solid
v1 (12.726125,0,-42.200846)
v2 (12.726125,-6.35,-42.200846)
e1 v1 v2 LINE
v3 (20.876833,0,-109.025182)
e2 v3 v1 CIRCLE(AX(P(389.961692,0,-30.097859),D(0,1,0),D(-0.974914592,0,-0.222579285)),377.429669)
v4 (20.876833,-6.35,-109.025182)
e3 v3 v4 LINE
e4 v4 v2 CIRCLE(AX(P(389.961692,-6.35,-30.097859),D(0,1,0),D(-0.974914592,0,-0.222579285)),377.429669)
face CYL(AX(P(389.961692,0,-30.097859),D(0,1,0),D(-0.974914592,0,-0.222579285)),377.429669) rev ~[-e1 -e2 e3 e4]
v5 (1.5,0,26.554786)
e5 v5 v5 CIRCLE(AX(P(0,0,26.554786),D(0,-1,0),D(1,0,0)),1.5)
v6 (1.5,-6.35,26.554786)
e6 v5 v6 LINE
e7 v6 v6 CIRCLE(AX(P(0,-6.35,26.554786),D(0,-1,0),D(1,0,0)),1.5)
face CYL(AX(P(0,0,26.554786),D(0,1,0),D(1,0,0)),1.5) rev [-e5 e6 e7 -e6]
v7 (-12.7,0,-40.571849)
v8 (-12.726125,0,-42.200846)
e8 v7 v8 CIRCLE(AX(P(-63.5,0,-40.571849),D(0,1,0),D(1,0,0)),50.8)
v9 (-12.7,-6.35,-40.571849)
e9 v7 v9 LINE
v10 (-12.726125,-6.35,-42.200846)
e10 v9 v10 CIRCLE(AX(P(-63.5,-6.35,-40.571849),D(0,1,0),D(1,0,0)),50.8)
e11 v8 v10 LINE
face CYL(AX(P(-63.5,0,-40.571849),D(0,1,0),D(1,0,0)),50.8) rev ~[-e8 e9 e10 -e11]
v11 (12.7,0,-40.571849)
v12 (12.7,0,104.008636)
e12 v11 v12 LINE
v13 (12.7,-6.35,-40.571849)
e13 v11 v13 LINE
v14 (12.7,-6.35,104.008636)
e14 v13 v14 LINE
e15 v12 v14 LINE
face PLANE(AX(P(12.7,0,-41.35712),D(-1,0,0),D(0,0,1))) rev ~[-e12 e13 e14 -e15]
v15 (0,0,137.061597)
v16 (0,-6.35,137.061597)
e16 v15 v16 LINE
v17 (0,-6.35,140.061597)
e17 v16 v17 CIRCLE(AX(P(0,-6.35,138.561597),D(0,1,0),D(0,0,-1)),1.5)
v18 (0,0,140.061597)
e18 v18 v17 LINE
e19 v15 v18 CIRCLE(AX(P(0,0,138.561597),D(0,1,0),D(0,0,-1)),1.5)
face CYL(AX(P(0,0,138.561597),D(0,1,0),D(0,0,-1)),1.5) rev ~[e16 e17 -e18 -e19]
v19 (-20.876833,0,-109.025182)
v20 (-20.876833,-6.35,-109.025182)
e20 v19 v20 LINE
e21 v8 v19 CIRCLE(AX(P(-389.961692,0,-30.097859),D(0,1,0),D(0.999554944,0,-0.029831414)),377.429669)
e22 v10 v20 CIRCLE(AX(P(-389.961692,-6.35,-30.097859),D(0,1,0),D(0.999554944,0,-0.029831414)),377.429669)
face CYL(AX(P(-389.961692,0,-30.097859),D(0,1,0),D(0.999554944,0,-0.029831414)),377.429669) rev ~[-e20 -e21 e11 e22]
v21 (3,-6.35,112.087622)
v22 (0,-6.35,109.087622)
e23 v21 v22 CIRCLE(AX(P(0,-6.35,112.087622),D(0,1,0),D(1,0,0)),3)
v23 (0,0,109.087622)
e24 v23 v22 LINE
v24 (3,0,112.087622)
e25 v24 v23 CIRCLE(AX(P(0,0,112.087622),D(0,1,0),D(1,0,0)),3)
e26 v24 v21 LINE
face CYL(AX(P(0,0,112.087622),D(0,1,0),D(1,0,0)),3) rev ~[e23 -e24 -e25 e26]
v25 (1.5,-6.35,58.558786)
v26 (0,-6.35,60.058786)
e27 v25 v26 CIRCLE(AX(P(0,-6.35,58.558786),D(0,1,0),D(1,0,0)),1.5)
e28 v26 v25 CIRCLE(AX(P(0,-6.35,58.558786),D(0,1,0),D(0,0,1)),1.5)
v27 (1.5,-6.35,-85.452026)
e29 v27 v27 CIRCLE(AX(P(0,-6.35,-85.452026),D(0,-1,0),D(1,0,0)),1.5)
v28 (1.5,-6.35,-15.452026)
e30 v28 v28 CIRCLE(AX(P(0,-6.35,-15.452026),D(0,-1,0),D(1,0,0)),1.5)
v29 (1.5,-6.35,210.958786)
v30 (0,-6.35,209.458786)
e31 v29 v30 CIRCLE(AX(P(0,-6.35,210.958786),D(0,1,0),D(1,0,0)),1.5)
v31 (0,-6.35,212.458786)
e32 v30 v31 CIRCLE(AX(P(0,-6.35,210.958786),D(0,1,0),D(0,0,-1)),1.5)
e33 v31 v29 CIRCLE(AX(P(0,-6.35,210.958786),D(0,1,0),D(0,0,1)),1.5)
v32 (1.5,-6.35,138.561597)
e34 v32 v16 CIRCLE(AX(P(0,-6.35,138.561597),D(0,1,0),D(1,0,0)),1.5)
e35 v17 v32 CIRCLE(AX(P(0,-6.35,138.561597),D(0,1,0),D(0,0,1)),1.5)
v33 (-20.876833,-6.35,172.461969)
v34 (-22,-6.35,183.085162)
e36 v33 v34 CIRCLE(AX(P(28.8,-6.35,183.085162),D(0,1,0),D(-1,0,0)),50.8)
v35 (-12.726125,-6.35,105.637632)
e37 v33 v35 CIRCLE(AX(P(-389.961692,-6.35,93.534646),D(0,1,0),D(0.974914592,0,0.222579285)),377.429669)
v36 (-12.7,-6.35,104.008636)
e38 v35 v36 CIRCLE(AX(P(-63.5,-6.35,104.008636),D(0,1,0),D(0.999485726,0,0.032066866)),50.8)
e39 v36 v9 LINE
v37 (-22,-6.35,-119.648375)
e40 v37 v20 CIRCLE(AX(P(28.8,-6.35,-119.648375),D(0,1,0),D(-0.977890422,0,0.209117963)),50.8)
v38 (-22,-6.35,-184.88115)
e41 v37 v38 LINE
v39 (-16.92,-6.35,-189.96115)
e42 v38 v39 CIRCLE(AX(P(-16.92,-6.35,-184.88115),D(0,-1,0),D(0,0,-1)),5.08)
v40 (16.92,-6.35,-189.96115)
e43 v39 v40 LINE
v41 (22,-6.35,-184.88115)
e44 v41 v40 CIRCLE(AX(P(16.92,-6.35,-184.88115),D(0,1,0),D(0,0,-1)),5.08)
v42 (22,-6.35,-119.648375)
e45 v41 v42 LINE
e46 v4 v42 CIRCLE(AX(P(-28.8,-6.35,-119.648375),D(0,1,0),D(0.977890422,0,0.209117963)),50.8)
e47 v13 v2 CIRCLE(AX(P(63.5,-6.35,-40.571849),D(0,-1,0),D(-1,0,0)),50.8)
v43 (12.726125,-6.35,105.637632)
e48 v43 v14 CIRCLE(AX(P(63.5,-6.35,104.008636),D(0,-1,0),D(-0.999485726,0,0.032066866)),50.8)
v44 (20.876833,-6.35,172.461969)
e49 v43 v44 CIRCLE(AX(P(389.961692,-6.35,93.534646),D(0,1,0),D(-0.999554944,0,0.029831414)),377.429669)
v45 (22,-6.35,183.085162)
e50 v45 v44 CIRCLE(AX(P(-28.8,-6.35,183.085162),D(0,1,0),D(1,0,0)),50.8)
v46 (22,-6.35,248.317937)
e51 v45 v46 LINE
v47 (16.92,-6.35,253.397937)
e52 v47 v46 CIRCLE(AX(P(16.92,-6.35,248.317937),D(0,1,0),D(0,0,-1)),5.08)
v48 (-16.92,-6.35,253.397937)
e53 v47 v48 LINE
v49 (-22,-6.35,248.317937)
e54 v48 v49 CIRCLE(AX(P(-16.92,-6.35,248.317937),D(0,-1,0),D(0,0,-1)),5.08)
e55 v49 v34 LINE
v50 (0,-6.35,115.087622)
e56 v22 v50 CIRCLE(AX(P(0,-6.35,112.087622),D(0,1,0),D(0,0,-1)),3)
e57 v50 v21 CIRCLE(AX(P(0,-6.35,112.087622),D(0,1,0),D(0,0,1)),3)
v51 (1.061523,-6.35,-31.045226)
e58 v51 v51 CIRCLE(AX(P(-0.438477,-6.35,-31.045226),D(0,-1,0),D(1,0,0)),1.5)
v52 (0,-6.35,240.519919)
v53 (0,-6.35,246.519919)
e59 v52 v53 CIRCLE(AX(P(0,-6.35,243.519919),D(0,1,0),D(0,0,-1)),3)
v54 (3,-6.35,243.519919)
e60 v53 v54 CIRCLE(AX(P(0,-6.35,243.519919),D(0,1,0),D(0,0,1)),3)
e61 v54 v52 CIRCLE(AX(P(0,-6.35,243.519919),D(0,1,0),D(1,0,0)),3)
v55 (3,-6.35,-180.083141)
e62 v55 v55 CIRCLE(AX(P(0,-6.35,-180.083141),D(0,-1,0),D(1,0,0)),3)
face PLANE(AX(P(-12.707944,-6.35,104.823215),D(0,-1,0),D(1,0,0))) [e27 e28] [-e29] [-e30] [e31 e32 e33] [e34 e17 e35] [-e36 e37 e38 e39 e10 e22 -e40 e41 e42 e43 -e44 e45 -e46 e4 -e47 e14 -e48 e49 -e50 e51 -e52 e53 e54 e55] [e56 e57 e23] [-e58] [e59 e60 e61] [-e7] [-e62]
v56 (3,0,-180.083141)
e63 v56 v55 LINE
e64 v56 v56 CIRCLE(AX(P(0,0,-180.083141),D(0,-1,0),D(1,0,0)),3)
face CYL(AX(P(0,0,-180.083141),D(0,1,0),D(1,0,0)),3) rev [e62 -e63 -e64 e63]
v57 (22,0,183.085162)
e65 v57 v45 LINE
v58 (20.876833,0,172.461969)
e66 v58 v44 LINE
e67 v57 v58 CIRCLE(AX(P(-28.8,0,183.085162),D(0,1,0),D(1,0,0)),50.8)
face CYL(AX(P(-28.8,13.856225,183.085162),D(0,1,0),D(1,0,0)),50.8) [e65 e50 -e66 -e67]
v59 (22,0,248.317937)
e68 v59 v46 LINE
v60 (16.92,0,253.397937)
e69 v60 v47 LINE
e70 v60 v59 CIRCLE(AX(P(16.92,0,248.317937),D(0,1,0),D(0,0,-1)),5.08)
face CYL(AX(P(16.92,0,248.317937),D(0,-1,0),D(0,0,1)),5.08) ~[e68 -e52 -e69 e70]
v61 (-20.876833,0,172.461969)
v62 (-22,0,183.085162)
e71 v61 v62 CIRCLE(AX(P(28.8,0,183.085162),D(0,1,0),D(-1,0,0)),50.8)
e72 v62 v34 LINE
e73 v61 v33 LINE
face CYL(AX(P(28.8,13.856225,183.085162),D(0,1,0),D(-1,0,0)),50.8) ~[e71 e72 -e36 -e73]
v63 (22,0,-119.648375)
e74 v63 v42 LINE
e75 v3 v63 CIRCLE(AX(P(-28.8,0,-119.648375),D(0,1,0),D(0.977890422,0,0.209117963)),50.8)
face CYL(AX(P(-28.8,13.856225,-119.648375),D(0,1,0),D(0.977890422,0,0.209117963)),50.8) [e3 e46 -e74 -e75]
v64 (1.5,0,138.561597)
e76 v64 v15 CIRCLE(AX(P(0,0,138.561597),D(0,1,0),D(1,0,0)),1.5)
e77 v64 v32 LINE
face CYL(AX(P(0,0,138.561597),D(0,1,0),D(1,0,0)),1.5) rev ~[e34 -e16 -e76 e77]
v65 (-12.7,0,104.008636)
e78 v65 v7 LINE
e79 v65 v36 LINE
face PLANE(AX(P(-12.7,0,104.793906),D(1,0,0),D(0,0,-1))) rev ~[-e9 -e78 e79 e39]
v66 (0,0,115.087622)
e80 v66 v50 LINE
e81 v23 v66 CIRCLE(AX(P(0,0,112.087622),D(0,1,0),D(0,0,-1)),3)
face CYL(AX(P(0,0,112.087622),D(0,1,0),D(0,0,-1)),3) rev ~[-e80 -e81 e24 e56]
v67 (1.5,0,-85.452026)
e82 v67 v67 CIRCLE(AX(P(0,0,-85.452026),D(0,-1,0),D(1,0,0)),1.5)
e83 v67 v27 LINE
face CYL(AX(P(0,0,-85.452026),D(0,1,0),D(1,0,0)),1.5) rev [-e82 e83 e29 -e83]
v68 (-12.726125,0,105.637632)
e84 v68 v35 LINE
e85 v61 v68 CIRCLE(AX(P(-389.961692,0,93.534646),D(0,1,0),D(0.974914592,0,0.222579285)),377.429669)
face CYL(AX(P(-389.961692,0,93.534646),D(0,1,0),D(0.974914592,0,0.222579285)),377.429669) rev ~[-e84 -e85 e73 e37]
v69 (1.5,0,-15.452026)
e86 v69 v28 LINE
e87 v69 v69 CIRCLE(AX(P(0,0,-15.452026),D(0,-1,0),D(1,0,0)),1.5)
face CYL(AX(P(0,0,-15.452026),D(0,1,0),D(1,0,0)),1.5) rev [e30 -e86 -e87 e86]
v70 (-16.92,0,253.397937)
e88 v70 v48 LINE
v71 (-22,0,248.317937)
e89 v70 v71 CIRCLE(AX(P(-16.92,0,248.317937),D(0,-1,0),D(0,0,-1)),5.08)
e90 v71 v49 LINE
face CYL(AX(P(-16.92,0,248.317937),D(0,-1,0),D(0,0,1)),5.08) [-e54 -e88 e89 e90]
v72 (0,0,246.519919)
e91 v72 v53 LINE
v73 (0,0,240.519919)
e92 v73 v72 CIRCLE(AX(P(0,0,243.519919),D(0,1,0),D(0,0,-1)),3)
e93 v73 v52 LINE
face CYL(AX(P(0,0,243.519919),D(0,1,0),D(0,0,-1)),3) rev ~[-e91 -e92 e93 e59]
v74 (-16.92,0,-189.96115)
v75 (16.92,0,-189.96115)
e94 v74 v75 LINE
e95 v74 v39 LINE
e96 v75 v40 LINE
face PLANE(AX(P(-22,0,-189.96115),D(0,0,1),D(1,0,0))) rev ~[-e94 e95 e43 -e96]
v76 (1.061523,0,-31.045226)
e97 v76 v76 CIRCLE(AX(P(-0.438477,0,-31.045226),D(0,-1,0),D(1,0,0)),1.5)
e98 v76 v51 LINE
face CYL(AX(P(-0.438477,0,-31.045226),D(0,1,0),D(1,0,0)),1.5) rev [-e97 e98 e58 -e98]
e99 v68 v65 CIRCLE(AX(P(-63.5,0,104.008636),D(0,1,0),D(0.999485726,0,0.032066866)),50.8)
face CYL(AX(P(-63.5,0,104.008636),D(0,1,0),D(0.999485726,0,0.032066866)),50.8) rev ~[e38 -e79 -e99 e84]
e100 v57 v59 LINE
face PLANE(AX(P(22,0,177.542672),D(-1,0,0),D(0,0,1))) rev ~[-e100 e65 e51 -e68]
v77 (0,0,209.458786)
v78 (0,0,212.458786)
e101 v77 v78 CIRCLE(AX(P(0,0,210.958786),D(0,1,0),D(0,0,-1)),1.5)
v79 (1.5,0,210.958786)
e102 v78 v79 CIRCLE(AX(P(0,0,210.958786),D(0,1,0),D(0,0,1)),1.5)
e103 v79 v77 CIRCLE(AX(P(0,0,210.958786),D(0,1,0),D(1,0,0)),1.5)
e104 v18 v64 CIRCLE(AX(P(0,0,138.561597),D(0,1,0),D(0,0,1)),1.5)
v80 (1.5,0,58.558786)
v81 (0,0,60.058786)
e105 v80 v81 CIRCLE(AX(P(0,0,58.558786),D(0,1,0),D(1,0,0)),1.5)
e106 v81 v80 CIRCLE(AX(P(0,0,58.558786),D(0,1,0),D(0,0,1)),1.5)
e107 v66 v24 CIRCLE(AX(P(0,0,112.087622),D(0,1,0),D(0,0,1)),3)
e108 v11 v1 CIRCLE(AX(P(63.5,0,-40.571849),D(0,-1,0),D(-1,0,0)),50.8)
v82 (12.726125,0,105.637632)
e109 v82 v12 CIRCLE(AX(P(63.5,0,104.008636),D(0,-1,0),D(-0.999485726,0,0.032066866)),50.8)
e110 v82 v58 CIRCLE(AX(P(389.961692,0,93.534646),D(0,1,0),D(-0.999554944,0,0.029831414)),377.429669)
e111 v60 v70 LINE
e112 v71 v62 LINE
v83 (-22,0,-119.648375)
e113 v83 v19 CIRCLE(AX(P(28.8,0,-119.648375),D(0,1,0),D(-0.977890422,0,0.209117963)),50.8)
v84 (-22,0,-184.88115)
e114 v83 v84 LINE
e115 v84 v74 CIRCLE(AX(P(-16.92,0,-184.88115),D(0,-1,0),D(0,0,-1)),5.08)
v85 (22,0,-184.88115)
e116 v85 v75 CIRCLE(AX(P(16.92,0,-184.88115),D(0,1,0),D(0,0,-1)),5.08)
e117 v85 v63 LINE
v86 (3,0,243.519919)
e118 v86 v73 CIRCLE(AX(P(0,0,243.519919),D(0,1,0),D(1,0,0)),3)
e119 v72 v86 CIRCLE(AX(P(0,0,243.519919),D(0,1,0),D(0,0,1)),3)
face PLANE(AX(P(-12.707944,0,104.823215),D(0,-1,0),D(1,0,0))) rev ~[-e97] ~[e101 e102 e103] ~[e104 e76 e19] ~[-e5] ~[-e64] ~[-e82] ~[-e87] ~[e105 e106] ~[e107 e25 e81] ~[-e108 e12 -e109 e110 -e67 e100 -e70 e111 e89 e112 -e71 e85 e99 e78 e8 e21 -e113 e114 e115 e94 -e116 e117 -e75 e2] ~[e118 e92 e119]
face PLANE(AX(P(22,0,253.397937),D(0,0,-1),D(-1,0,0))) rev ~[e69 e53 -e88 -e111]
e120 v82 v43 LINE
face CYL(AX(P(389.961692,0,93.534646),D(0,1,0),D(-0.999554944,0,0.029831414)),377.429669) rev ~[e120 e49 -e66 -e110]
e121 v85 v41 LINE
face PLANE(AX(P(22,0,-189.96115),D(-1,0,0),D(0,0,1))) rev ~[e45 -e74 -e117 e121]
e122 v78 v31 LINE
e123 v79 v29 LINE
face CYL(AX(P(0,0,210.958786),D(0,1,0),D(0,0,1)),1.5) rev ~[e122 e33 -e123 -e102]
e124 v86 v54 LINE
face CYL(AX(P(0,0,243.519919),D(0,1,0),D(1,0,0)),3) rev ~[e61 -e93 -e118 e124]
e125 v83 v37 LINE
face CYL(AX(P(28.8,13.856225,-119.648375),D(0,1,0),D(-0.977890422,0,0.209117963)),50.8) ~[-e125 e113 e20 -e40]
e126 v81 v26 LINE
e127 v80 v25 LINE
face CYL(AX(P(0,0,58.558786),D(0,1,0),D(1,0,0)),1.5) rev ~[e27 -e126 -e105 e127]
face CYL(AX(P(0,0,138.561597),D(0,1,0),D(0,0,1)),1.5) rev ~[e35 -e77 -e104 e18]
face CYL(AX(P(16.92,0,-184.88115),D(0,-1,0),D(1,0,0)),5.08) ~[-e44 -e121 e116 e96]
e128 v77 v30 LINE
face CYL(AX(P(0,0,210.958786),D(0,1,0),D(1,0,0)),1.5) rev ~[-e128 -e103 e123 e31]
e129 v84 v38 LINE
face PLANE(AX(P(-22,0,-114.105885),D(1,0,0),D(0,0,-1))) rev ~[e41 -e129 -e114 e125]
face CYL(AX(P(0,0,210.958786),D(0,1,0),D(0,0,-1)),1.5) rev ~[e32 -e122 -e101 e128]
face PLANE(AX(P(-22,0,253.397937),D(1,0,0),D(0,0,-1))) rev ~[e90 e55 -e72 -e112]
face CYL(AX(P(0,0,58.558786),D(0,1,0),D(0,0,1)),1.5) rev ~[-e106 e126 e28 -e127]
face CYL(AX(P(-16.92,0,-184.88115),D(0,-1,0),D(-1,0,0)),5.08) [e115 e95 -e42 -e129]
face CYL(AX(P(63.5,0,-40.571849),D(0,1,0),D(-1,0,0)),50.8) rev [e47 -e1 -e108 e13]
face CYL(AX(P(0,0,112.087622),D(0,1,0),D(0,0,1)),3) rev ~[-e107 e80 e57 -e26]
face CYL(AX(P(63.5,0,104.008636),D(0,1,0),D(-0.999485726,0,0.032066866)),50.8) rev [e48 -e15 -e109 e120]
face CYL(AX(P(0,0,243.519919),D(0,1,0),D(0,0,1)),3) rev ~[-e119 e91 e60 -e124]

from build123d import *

# Parameters (mm, degrees)
F0_R        = 1.5
F0_R_2      = 3
F1_DEPTH    = 6.35
F2_R        = 5.08
F3_T1_DEPTH = 6.35
F3_T3_DEPTH = 34.0624500619


# Not quite as in the source:
# - a fillet or chamfer that OpenCascade refuses, or shapes differently, is made with other operations: its cross-section is extruded or revolved along the edge and cut away or added
# - a feature names something its author has since deleted; it is built from what else it names


with BuildPart() as f1:
    # F0 (on Front) → F1 (new body)
    with BuildSketch(Plane.XZ):
        Polygon((-12.7, 104.7939062119), (-12.7, -41.3571195934), (-12.7, -95.0903743505), (12.7, -95.0903743505), (12.7, -41.3571195934), (12.7, 104.7939062119), (12.7, 162.231490016), (0, 162.231490016), (-12.7, 162.231490016), align=None)
        with Locations((-0.4384766798, -31.0452261312)):
            Circle(F0_R, mode=Mode.SUBTRACT)
        with Locations((0, -85.4520261312)):
            Circle(F0_R, mode=Mode.SUBTRACT)
        with Locations((0, -15.4520261312)):
            Circle(F0_R, mode=Mode.SUBTRACT)
        with Locations((0, 26.5547856688)):
            Circle(F0_R, mode=Mode.SUBTRACT)
        with BuildLine():
            ThreePointArc((1.5, 58.5587856688), (-1.0606601718, 57.4981254971), (0, 60.0587856688))
            ThreePointArc((0, 60.0587856688), (1.0606601718, 59.6194458406), (1.5, 58.5587856688))
        make_face(mode=Mode.SUBTRACT)
        with BuildLine():
            ThreePointArc((0, 109.0876222849), (-3, 112.0876222849), (0, 115.0876222849))
            ThreePointArc((0, 115.0876222849), (2.1213203436, 114.2089426284), (3, 112.0876222849))
            ThreePointArc((3, 112.0876222849), (2.1213203436, 109.9663019413), (0, 109.0876222849))
        make_face(mode=Mode.SUBTRACT)
        with BuildLine():
            ThreePointArc((0, 137.0615974688), (-1.5, 138.5615974688), (0, 140.0615974688))
            ThreePointArc((0, 140.0615974688), (1.0606601718, 139.6222576406), (1.5, 138.5615974688))
            ThreePointArc((1.5, 138.5615974688), (1.0606601718, 137.5009372971), (0, 137.0615974688))
        make_face(mode=Mode.SUBTRACT)
        with BuildLine():
            ThreePointArc((-22, 177.5426715612), (-15.5787747464, 141.3947174009), (-12.7, 104.7939062119))
            Line((-12.7, 104.7939062119), (-12.7, 162.231490016))
            Line((-12.7, 162.231490016), (0, 162.231490016))
            Line((0, 162.231490016), (0, 177.1979365494))
            Line((0, 177.1979365494), (0, 209.4587856688))
            ThreePointArc((0, 209.4587856688), (-1.5, 210.9587856688), (0, 212.4587856688))
            Line((0, 212.4587856688), (0, 240.5199192026))
            ThreePointArc((0, 240.5199192026), (-3, 243.5199192026), (0, 246.5199192026))
            Line((0, 246.5199192026), (0, 253.3979365494))
            Line((0, 253.3979365494), (-4.6853246795, 253.3979365494))
            Line((-4.6853246795, 253.3979365494), (-22, 253.3979365494))
            Line((-22, 253.3979365494), (-22, 236.307715069))
            Line((-22, 236.307715069), (-22, 225.4278063774))
            Line((-22, 225.4278063774), (-22, 177.5426715612))
        make_face()
        with BuildLine():
            Line((12.7, 162.231490016), (12.7, 104.7939062119))
            ThreePointArc((12.7, 104.7939062119), (15.5787747464, 141.3947174009), (22, 177.5426715612))
            Line((22, 177.5426715612), (22, 225.4278063774))
            Line((22, 225.4278063774), (22, 236.307715069))
            Line((22, 236.307715069), (22, 253.3979365494))
            Line((22, 253.3979365494), (4.6853246795, 253.3979365494))
            Line((4.6853246795, 253.3979365494), (0, 253.3979365494))
            Line((0, 253.3979365494), (0, 246.5199192026))
            ThreePointArc((0, 246.5199192026), (2.1213203436, 245.6412395461), (3, 243.5199192026))
            ThreePointArc((3, 243.5199192026), (2.1213203436, 241.398598859), (0, 240.5199192026))
            Line((0, 240.5199192026), (0, 212.4587856688))
            ThreePointArc((0, 212.4587856688), (1.0606601718, 212.0194458406), (1.5, 210.9587856688))
            ThreePointArc((1.5, 210.9587856688), (1.0606601718, 209.8981254971), (0, 209.4587856688))
            Line((0, 209.4587856688), (0, 177.1979365494))
            Line((0, 177.1979365494), (0, 162.231490016))
            Line((0, 162.231490016), (12.7, 162.231490016))
        make_face()
        with BuildLine():
            Line((-22, -189.9611499309), (-4.6853246795, -189.9611499309))
            ThreePointArc((-4.6853246795, -189.9611499309), (-10.3525559476, -187.6137058785), (-12.7, -181.9464746103))
            Line((-12.7, -181.9464746103), (-12.7, -113.7611499309))
            Line((-12.7, -113.7611499309), (12.7, -113.7611499309))
            Line((12.7, -113.7611499309), (12.7, -181.9464746103))
            ThreePointArc((12.7, -181.9464746103), (10.3525559476, -187.6137058785), (4.6853246795, -189.9611499309))
            Line((4.6853246795, -189.9611499309), (22, -189.9611499309))
            Line((22, -189.9611499309), (22, -172.8709284505))
            Line((22, -172.8709284505), (22, -161.9910197589))
            Line((22, -161.9910197589), (22, -114.1058849427))
            ThreePointArc((22, -114.1058849427), (15.5787747464, -77.9579307824), (12.7, -41.3571195934))
            Line((12.7, -41.3571195934), (12.7, -95.0903743505))
            Line((12.7, -95.0903743505), (-12.7, -95.0903743505))
            Line((-12.7, -95.0903743505), (-12.7, -41.3571195934))
            ThreePointArc((-12.7, -41.3571195934), (-15.5787747464, -77.9579307824), (-22, -114.1058849427))
            Line((-22, -114.1058849427), (-22, -161.9910197589))
            Line((-22, -161.9910197589), (-22, -172.8709284505))
            Line((-22, -172.8709284505), (-22, -189.9611499309))
        make_face()
        with BuildLine():
            ThreePointArc((-12.7, -181.9464746103), (-10.3525559476, -187.6137058785), (-4.6853246795, -189.9611499309))
            Line((-4.6853246795, -189.9611499309), (0, -189.9611499309))
            Line((0, -189.9611499309), (4.6853246795, -189.9611499309))
            ThreePointArc((4.6853246795, -189.9611499309), (10.3525559476, -187.6137058785), (12.7, -181.9464746103))
            Line((12.7, -181.9464746103), (12.7, -113.7611499309))
            Line((12.7, -113.7611499309), (-12.7, -113.7611499309))
            Line((-12.7, -113.7611499309), (-12.7, -181.9464746103))
        make_face()
        with Locations((0, -180.0831407309)):
            Circle(F0_R_2, mode=Mode.SUBTRACT)
    extrude(amount=F1_DEPTH)

    # F2
    f2_edges = [f1.edges().sort_by_distance(p)[0] for p in [
        (-22, -3.175, 253.397937),
        (22, -3.175, 253.397937),
        (22, -3.175, -189.96115),
        (-22, -3.175, -189.96115),
    ]]
    fillet(f2_edges, radius=F2_R)

    # F3: fillet of radius 50.8 on 8 edges, made by hand

    # F3_s2 → F3_t1 (join)
    with BuildSketch(Plane.XZ):
        with BuildLine():
            ThreePointArc((-12.7261251288, 105.6376323271), (-12.7065317021, 104.8232386677), (-12.7, 104.0086355302))
            Line((-12.7, 104.0086355302), (-12.7, 104.7939062119))
            ThreePointArc((-12.7, 104.7939062119), (-12.7128266876, 105.2157765732), (-12.7261251288, 105.6376323271))
        make_face()
        with BuildLine():
            ThreePointArc((12.7261251288, 105.6376323271), (12.7065317021, 104.8232386677), (12.7, 104.0086355302))
            Line((12.7, 104.0086355302), (12.7, 104.7939062119))
            ThreePointArc((12.7, 104.7939062119), (12.7128266876, 105.2157765732), (12.7261251288, 105.6376323271))
        make_face()
        with BuildLine():
            ThreePointArc((12.7, -40.5718489117), (12.7065317021, -41.3864520492), (12.7261251288, -42.2008457086))
            ThreePointArc((12.7261251288, -42.2008457086), (12.7128266876, -41.7789899547), (12.7, -41.3571195934))
            Line((12.7, -41.3571195934), (12.7, -40.5718489117))
        make_face()
        with BuildLine():
            ThreePointArc((-12.7, -40.5718489116), (-12.7065317021, -41.3864520492), (-12.7261251288, -42.2008457086))
            ThreePointArc((-12.7261251288, -42.2008457086), (-12.7128266876, -41.7789899547), (-12.7, -41.3571195934))
            Line((-12.7, -41.3571195934), (-12.7, -40.5718489116))
        make_face()
    extrude(amount=F3_T1_DEPTH)

    # F3_s4 → F3_t3 (cut)
    with BuildSketch(Plane.XZ.offset(-13.856225031)):
        with BuildLine():
            ThreePointArc((-20.8768334444, -109.025182453), (-21.7184280188, -114.3071737314), (-22, -119.6483749551))
            Line((-22, -119.6483749551), (-22, -114.1058849427))
            ThreePointArc((-22, -114.1058849427), (-21.429661091, -111.5674692633), (-20.8768334444, -109.025182453))
        make_face()
        with BuildLine():
            ThreePointArc((20.8768334444, -109.025182453), (21.7184280188, -114.3071737314), (22, -119.6483749551))
            Line((22, -119.6483749551), (22, -114.1058849427))
            ThreePointArc((22, -114.1058849427), (21.429661091, -111.5674692633), (20.8768334444, -109.025182453))
        make_face()
        with BuildLine():
            ThreePointArc((22, 183.0851615736), (21.7184280188, 177.7439603499), (20.8768334444, 172.4619690715))
            ThreePointArc((20.8768334444, 172.4619690715), (21.429661091, 175.0042558818), (22, 177.5426715612))
            Line((22, 177.5426715612), (22, 183.0851615736))
        make_face()
        with BuildLine():
            ThreePointArc((-22, 183.0851615736), (-21.7184280188, 177.7439603499), (-20.8768334444, 172.4619690715))
            ThreePointArc((-20.8768334444, 172.4619690715), (-21.429661091, 175.0042558818), (-22, 177.5426715612))
            Line((-22, 177.5426715612), (-22, 183.0851615736))
        make_face()
    extrude(amount=F3_T3_DEPTH, mode=Mode.SUBTRACT)


solid = f1.part
